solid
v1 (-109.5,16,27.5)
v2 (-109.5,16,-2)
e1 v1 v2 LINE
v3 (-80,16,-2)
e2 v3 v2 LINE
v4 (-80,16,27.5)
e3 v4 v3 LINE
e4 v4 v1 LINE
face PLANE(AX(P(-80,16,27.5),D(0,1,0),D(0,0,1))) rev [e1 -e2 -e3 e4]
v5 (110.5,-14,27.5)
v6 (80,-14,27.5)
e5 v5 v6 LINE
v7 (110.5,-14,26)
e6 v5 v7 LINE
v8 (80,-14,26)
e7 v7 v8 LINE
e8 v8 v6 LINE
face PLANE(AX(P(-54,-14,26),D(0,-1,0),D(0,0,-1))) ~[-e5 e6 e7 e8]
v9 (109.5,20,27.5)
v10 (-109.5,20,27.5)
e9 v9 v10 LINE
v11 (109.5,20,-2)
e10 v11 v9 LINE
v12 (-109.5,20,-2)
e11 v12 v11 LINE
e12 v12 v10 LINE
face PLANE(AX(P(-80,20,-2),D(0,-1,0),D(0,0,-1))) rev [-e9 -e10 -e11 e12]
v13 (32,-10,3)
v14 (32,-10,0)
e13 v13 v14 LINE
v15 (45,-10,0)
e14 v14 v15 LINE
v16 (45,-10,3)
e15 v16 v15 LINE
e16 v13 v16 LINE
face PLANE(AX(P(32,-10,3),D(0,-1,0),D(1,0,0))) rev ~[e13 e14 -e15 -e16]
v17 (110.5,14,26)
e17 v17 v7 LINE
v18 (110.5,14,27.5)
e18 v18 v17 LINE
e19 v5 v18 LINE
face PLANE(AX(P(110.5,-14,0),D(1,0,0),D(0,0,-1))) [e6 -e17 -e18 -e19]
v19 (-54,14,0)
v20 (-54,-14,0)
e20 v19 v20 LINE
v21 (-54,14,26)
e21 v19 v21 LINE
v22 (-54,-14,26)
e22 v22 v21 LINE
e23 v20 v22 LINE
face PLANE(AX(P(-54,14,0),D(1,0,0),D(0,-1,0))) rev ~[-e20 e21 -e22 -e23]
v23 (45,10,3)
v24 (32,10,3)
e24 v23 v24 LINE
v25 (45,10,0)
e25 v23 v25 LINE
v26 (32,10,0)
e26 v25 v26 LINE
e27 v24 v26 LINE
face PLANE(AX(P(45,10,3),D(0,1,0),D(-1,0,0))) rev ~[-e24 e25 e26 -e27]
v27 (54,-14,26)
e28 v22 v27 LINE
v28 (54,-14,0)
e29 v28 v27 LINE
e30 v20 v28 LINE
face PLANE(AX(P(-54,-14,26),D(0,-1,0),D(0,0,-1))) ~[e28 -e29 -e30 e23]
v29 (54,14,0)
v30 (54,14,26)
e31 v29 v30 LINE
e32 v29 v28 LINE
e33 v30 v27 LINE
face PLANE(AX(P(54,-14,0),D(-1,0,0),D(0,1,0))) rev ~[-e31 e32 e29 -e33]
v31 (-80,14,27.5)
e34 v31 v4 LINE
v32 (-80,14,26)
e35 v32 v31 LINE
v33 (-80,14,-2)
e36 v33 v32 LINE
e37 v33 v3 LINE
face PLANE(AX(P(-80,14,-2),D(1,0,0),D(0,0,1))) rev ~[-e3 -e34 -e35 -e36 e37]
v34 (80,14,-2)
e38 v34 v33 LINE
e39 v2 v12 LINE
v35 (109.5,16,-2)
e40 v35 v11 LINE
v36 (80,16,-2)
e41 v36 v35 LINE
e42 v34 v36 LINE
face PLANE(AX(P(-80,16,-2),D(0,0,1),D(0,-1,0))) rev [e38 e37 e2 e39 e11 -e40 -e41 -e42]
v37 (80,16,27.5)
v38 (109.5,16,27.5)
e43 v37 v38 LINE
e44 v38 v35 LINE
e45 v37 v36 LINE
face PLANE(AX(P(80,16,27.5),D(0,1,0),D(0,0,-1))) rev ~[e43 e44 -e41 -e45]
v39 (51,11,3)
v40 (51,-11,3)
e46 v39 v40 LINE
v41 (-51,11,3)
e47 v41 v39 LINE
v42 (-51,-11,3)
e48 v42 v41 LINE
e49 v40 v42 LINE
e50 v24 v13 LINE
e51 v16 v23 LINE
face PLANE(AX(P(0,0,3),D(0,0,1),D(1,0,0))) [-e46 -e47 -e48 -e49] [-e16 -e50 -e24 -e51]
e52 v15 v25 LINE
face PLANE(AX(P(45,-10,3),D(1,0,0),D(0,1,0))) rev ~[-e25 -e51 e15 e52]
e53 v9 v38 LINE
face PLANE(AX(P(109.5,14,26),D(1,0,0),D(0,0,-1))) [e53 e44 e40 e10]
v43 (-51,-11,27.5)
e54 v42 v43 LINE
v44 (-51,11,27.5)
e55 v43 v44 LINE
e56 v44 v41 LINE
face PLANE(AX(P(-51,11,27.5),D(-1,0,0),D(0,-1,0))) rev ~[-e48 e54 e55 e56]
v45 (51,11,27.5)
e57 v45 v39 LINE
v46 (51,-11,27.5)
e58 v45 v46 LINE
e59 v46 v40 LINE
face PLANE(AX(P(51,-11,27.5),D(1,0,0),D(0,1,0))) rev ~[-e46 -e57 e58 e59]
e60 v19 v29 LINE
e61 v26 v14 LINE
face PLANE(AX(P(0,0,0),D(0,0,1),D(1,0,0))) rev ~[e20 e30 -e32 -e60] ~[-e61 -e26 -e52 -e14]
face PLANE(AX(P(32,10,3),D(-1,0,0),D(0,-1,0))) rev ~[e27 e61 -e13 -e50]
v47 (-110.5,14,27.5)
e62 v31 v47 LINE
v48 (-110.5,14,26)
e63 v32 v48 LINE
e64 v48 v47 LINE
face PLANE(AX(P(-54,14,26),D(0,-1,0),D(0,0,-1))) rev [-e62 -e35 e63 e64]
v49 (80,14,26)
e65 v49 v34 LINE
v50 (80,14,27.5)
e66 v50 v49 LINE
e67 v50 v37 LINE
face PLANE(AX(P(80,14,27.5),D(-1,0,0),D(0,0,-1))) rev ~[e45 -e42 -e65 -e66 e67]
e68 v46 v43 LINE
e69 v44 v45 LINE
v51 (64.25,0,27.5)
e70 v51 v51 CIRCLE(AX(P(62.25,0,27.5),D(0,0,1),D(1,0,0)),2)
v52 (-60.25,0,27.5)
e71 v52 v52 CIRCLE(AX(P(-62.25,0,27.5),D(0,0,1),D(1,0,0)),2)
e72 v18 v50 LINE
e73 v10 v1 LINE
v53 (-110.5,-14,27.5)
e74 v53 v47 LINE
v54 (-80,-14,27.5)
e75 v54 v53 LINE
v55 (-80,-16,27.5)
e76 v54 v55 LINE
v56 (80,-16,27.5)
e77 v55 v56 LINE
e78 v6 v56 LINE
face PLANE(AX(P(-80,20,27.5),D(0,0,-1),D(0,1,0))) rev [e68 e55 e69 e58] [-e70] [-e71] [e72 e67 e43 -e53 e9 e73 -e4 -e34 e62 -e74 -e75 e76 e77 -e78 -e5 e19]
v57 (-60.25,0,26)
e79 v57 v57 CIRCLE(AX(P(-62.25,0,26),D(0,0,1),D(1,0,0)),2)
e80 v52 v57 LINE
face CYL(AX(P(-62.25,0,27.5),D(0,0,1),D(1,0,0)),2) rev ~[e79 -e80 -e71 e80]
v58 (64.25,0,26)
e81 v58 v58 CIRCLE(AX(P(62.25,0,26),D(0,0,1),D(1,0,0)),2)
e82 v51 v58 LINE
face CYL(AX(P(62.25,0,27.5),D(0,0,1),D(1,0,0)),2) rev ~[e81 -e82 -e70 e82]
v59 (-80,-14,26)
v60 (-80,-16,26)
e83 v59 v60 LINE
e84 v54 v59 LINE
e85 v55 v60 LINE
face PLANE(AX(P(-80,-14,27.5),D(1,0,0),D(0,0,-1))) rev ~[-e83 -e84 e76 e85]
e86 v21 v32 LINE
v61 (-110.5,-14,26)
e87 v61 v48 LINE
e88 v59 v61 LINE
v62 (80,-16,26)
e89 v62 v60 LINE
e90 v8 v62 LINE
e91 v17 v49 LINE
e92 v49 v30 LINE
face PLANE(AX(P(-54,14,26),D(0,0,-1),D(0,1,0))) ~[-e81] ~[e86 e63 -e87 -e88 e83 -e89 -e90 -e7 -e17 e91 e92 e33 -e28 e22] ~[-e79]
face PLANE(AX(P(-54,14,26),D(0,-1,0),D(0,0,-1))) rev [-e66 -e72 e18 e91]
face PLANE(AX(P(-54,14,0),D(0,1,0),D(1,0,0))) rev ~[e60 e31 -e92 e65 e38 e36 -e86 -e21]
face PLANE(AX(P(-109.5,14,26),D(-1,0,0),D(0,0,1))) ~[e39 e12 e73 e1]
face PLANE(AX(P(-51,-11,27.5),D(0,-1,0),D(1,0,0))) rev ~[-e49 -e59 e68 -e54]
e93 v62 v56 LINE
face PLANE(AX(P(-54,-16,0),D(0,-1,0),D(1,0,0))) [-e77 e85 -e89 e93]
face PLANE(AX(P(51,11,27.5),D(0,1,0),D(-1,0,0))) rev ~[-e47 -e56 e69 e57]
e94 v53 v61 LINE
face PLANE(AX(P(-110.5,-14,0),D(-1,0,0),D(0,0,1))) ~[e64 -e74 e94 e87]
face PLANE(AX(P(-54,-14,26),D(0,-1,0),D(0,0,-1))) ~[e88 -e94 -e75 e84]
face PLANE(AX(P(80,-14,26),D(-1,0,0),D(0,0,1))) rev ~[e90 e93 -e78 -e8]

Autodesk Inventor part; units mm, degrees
ref_plane "YZ Plane" through (0, 0, 0) normal (1, 0, 0) x (0, 1, 0)
ref_plane "XZ Plane" through (0, 0, 0) normal (0, 1, 0) x (-1, 0, 0)
ref_plane "XY Plane" through (0, 0, 0) normal (0, 0, 1) x (1, 0, 0)
sketch "Эскиз1" plane through (0, 0, 0) normal (0, 0, 1) x (1, 0, 0)
  line L0 (-54, -14) -> (54, -14)
  line L1 (54, -14) -> (54, 14)
  line L2 (54, 14) -> (-54, 14)
  line L3 (-54, 14) -> (-54, -14)
  line L4 (-54, -14) -> (54, 14) construction
  line L5 (54, -14) -> (-54, 14) construction
  point P0 (0, 0)
  dimension "d0" = 108
  dimension "d1" = 28
extrude "Выдавливание1" add sketch "Эскиз1" along normal blind 27.5
sketch "Эскиз2" plane through (0, 0, 27.5) normal (0, 0, 1) x (1, 0, 0)
  line L0 (-51, -11) -> (51, -11)
  line L1 (51, -11) -> (51, 11)
  line L2 (51, 11) -> (-51, 11)
  line L3 (-51, 11) -> (-51, -11)
  line L4 (-51, -11) -> (51, 11) construction
  line L5 (51, -11) -> (-51, 11) construction
  line L6 (54, 14) -> (-54, 14) projected
  line L7 (54, -14) -> (54, 14) projected
  point P0 (0, 0)
  dimension "d4" = 3
  dimension "d5" = 3
extrude "Выдавливание2" cut sketch "Эскиз2" against normal blind 24.5
sketch "Эскиз3" plane through (54, -14, 0) normal (1, 0, 0) x (0, 0, -1)
  line L0 (0, 28) -> (-27.5, 28) projected
  line L1 (0, 0) -> (-27.5, 0) projected
  line L2 (-27.5, 28) -> (-26, 28)
  line L3 (-26, 28) -> (-26, 0)
  line L4 (-26, 0) -> (-27.5, 0)
  line L5 (-27.5, 0) -> (-27.5, 28)
  point P0 (0, 14)
  dimension "d8" = 1.5
extrude "Выдавливание3" add sketch "Эскиз3" along normal blind 50
mirror "Зеркальное отражение1" about plane through (0, 0, 0) normal (1, 0, 0) of "Выдавливание3"
move faces "Перенос1" translate (6.5, 0, 0) faces at (104, 4.6667, 27)
move faces "Перенос2" translate (-6.5, 0, 0) faces at (-104, 4.6667, 27)
sketch "Эскиз7" plane through (-54, -14, 0) normal (0, -1, 0) x (1, 0, 0)
  line L0 (-56.5, 27.5) -> (164.5, 27.5) projected
  line L1 (0, 26) -> (-56.5, 26) projected
  line L2 (134, 27.5) -> (-26, 27.5)
  line L3 (-26, 27.5) -> (-26, 26)
  line L4 (-26, 26) -> (134, 26)
  line L5 (134, 26) -> (134, 27.5)
  line L6 (0, 0) -> (108, 0) projected
  point P0 (54, 0)
  point P1 (-26, 26.75)
  point P2 (54, 0)
  dimension "d29" = 160
  dimension "d30" = 80
extrude "Выдавливание7" add sketch "Эскиз7" along normal blind 2
sketch "Эскиз8" plane through (-54, 14, 0) normal (0, 1, 0) x (1, 0, 0)
  line L0 (-56.5, -27.5) -> (164.5, -27.5) projected
  line L1 (-26, -27.5) -> (134, -27.5)
  line L2 (134, -27.5) -> (134, 2)
  line L3 (134, 2) -> (-26, 2)
  line L4 (-26, 2) -> (-26, -27.5)
  line L5 (108, 0) -> (0, 0) projected
  point P0 (54, 0)
  point P1 (54, 0)
  dimension "d33" = 160
  dimension "d34" = 80
  dimension "d35" = 29.5
extrude "Выдавливание8" add sketch "Эскиз8" along normal blind 6
sketch "Эскиз9" plane through (80, 14, 26) normal (1, 0, 0) x (0, 0, -1)
  line L0 (28, 0) -> (28, 6) projected
  line L1 (28, 6) -> (-1.5, 6)
  line L2 (-1.5, 6) -> (-1.5, 2)
  line L3 (-1.5, 2) -> (28, 2)
  line L4 (28, 2) -> (28, 6)
  point P0 (26, -14)
  dimension "d38" = 4
extrude "Выдавливание9" add sketch "Эскиз9" along normal blind 29.5
mirror "Зеркальное отражение3" about plane through (0, 0, 0) normal (1, 0, 0) of "Выдавливание9"
sketch "Эскиз10" plane through (0, 0, 27.5) normal (0, 0, 1) x (1, 0, 0)
  circle A0 centre (-62.25, 0) radius 2 projected
  circle A1 centre (62.25, 0) radius 2 projected
  point P0 (0, 0)
extrude "Выдавливание10" cut sketch "Эскиз10" against normal through all
sketch "Эскиз11" plane through (0, 0, 3) normal (0, 0, 1) x (1, 0, 0)
  line L0 (32, -10) -> (45, -10)
  line L1 (45, -10) -> (45, 10)
  line L2 (45, 10) -> (32, 10)
  line L3 (32, 10) -> (32, -10)
  line L4 (32, -10) -> (45, 10) construction
  line L5 (45, -10) -> (32, 10) construction
  line L6 (51, 11) -> (51, -11) projected
  point P0 (0, 0)
  point P1 (38.5, 0)
  dimension "d43" = 13
  dimension "d44" = 20
  dimension "d45" = 6
extrude "Выдавливание11" cut sketch "Эскиз11" against normal through all
equation "\"d30\" = 0.5 * d29"
equation "\"d34\" = 0.5 * d33"
properties part number "000.009 - Короб" material "Пластик АБС"
